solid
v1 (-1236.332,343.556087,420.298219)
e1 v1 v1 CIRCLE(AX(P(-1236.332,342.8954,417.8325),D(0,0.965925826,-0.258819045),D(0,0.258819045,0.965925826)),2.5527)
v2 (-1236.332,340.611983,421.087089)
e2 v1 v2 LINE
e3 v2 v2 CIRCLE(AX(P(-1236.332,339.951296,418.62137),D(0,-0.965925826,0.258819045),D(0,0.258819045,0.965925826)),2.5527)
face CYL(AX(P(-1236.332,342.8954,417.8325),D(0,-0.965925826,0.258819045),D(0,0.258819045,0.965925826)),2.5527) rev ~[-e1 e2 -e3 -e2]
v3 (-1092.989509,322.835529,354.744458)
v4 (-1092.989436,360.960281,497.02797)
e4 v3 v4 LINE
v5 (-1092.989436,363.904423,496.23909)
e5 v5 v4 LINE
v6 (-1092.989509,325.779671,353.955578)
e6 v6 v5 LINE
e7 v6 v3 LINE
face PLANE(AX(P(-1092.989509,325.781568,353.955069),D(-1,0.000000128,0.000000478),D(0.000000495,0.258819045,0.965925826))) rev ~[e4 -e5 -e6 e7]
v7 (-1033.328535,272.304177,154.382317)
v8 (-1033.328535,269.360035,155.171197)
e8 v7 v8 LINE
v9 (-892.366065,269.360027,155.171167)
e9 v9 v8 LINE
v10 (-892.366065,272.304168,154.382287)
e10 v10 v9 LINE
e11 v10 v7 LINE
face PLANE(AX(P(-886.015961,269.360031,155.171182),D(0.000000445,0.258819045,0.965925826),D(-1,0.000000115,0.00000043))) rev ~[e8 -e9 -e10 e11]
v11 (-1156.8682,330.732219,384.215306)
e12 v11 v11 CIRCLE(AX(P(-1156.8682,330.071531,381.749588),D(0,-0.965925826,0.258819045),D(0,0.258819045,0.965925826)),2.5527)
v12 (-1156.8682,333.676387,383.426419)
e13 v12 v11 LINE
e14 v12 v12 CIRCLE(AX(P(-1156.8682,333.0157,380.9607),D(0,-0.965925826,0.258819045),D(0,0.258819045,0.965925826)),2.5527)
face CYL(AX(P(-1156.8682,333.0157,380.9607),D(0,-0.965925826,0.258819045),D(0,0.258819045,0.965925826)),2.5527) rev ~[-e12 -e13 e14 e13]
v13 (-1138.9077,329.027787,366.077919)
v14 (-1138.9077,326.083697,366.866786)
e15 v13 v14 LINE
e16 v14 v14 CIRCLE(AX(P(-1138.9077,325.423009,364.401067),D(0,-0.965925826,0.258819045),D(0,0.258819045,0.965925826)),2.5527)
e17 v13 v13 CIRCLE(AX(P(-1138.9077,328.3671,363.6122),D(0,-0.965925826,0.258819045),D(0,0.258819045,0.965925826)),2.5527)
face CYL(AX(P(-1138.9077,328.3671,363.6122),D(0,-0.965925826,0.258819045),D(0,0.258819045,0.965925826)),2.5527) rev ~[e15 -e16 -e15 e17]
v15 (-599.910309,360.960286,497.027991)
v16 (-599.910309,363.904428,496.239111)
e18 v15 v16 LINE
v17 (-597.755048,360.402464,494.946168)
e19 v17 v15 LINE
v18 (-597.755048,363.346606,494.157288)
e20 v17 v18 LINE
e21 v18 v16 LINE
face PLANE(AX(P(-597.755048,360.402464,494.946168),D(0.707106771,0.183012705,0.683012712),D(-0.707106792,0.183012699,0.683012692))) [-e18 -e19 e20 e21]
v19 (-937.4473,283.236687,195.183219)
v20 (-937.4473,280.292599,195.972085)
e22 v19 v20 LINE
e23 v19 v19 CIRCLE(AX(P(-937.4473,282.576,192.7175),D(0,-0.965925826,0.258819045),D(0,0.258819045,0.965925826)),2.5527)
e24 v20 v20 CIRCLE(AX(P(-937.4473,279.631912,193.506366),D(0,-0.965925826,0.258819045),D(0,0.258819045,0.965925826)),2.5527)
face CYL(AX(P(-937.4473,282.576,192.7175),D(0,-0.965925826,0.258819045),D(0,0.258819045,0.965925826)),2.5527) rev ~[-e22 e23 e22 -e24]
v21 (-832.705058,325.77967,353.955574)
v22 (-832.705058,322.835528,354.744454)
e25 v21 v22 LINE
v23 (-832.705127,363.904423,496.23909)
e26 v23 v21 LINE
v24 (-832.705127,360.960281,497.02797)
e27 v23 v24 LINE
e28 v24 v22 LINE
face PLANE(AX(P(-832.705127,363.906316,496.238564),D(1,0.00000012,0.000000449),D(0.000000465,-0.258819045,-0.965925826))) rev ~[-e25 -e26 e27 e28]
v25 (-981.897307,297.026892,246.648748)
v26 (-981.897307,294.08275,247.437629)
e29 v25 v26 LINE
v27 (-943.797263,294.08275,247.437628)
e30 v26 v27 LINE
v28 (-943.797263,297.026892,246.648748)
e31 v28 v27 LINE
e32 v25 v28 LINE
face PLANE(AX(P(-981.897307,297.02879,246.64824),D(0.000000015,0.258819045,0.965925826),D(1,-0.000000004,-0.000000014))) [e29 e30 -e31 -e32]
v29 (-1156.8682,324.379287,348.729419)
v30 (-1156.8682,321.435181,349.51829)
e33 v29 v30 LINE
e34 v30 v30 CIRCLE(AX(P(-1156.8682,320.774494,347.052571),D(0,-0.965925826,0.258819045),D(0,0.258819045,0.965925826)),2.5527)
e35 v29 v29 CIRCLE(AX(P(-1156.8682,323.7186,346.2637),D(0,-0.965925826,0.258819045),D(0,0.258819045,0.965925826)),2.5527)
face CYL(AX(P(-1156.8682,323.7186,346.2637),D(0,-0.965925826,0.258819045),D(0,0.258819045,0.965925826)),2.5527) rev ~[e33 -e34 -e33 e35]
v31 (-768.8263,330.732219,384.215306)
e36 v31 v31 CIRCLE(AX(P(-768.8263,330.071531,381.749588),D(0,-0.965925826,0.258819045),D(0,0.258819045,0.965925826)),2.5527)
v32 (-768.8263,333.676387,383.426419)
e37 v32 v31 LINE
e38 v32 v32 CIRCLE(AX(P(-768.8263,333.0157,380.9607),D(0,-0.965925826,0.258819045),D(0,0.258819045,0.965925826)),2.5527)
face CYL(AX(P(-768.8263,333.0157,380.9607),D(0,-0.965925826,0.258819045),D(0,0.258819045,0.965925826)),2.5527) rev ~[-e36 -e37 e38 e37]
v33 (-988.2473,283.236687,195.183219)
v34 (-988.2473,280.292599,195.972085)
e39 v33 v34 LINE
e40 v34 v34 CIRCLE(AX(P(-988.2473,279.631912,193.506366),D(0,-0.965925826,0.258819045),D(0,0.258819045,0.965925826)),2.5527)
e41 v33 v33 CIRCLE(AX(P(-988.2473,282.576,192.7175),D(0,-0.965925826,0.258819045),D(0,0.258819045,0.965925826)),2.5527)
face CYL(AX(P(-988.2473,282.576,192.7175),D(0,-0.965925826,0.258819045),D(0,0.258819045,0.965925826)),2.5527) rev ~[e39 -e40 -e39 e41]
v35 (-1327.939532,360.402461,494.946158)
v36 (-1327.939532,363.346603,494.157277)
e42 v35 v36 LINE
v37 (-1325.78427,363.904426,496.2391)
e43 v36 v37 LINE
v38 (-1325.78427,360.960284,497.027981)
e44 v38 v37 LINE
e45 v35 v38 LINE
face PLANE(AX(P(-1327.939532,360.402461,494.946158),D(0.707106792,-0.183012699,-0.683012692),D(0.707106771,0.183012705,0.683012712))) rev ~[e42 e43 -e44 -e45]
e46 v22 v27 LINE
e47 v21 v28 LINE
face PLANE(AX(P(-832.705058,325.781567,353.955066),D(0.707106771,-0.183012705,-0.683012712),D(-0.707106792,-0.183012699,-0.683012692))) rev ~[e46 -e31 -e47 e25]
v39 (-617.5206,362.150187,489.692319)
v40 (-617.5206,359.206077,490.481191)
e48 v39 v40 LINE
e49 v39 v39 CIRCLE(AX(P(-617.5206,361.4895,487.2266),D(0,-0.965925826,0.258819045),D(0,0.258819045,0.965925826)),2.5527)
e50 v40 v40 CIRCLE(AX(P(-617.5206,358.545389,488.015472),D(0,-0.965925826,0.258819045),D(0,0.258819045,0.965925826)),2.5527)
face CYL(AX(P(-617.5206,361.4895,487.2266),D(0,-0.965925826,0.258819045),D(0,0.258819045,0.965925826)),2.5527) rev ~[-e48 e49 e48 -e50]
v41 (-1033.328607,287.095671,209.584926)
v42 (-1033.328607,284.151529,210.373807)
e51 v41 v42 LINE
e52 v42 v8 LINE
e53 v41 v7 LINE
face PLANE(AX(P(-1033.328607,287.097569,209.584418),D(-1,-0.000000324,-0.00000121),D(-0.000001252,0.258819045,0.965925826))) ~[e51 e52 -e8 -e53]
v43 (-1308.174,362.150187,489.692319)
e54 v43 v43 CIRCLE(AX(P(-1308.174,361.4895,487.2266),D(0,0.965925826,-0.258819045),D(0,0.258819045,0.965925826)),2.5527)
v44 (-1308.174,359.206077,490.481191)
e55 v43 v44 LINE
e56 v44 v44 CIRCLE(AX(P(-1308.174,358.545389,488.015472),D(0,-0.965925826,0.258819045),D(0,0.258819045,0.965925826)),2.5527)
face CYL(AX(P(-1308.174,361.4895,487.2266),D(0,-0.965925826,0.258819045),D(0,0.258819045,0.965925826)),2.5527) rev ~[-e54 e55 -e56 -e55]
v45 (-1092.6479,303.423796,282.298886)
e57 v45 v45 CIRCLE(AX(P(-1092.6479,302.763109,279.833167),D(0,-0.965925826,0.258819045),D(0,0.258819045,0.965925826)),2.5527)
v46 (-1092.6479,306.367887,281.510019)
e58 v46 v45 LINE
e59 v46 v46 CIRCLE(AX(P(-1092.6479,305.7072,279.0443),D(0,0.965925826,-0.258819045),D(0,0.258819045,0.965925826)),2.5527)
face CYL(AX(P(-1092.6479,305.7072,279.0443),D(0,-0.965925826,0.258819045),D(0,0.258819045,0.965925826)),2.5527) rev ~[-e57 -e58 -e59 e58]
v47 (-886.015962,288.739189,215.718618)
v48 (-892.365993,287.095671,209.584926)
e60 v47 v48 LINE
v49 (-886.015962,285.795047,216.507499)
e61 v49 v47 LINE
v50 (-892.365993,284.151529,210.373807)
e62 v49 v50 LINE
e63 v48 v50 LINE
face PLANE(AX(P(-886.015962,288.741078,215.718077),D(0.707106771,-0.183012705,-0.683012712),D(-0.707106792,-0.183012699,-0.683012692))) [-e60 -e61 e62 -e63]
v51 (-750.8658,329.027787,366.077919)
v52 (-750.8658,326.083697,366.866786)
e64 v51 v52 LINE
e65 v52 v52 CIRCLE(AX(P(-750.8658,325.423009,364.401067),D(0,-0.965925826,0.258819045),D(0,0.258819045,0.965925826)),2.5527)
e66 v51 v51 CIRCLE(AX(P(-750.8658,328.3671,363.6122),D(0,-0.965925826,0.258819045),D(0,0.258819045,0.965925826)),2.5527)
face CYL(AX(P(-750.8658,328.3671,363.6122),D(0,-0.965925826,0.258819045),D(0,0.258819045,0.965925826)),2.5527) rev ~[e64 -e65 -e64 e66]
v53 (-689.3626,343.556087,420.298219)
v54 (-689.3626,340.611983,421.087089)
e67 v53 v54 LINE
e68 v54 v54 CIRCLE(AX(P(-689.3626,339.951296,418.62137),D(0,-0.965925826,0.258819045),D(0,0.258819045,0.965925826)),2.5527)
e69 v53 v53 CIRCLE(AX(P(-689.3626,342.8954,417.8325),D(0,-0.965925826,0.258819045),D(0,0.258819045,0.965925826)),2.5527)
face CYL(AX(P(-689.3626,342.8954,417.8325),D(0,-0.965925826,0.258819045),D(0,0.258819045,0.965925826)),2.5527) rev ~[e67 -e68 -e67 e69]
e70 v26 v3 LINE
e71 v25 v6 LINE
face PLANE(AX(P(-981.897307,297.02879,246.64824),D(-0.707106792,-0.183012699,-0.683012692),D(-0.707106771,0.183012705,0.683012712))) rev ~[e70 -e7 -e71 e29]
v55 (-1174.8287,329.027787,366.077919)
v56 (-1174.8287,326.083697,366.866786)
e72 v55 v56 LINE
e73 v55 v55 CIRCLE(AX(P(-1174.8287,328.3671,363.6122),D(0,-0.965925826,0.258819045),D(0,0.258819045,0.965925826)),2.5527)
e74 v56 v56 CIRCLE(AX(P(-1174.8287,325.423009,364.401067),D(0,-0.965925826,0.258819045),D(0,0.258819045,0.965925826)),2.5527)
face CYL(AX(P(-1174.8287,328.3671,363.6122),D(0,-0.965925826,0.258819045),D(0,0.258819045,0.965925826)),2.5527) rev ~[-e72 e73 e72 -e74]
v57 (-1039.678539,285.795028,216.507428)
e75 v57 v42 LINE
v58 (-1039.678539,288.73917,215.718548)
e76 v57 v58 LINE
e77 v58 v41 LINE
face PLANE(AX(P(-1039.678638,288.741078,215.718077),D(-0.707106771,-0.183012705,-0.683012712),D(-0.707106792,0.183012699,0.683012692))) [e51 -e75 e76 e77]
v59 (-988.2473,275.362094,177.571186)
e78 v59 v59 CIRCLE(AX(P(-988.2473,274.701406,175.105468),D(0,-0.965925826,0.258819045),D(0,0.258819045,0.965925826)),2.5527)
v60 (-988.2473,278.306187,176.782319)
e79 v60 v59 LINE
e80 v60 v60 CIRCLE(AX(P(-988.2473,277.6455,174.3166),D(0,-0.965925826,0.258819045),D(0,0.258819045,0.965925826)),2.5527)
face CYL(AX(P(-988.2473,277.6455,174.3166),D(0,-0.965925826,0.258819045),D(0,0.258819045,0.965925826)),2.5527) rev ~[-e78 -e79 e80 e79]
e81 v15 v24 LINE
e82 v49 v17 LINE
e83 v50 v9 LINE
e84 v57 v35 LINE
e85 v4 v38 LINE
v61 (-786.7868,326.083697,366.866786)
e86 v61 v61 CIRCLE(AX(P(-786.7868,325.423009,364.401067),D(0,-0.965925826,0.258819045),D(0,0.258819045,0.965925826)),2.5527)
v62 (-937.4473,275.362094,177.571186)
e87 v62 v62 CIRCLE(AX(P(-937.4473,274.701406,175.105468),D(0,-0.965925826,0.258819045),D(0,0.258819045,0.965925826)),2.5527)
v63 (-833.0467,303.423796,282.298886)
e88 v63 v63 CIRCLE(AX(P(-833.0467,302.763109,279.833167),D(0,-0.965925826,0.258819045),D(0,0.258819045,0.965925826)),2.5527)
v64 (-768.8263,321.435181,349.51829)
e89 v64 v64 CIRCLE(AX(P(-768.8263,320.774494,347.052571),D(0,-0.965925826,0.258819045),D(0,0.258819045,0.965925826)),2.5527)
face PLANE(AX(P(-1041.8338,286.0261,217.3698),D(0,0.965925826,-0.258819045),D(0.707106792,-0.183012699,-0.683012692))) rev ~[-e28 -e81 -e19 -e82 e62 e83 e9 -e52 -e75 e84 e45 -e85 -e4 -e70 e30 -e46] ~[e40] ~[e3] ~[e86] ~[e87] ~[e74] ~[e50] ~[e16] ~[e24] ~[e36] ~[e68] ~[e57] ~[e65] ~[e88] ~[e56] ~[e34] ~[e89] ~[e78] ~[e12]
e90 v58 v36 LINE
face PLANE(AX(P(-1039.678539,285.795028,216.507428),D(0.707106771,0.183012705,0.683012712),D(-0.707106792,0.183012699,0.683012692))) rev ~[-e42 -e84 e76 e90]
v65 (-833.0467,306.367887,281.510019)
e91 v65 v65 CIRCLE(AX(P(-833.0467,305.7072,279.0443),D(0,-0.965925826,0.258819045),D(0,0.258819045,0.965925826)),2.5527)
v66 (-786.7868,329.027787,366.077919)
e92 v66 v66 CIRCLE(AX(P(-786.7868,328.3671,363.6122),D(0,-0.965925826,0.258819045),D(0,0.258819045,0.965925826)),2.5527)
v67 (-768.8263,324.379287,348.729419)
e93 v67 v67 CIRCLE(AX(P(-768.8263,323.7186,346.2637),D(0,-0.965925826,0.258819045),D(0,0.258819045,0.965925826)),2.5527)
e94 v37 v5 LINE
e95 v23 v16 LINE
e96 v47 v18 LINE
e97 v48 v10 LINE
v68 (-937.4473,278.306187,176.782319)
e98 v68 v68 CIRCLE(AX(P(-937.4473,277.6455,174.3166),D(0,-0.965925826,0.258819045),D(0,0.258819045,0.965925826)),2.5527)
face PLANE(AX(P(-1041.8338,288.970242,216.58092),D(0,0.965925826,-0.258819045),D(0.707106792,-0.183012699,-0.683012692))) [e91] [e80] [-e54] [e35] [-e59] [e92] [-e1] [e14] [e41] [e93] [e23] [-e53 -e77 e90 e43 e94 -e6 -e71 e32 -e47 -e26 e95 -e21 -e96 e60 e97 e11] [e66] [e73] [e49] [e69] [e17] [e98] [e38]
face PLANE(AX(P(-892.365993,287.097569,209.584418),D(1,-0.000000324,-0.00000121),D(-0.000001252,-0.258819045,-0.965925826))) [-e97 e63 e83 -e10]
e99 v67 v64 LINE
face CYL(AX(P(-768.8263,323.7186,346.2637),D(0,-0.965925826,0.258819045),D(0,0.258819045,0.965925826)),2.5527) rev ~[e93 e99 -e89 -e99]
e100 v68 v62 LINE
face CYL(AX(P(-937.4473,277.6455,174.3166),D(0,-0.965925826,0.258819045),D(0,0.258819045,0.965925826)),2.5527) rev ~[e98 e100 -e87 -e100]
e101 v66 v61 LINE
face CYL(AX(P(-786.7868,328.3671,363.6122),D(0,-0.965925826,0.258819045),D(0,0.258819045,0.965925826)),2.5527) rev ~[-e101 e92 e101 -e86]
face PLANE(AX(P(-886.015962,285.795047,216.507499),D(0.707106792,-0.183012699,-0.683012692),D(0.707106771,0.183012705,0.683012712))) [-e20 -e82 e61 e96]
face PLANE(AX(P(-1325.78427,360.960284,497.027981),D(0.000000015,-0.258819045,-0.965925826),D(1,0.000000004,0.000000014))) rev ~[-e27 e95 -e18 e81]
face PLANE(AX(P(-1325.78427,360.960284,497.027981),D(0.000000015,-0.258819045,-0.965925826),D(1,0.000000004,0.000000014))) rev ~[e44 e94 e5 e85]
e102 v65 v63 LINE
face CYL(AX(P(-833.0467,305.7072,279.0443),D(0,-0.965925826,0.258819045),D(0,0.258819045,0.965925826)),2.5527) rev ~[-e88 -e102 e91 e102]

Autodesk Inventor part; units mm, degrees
ref_plane "YZ Plane" through (0, 0, 0) normal (1, 0, 0) x (0, 1, 0)
ref_plane "Work Plane1" through (-1041.8338, 286.0261, 217.3698) normal (0, 0.9659258, -0.258819) x (0.7071068, -0.1830127, -0.6830127)
sketch "Sketch1" plane through (-1041.8338, 286.0261, 217.3698) normal (0, 0.9659258, -0.258819) x (0.7071068, -0.1830127, -0.6830127)
  line L0 (110.8111, -517.2111) -> (110.8111, -110.8111) construction
  line L1 (109.9183, -108.6558) -> (2.1553, -0.8927) construction
  line L2 (107.7631, -517.2111) -> (-203.2, -206.248) construction
  line L3 (2.1553, -0.8927) -> (110.8111, -109.5486)
  line L4 (110.8111, -109.5486) -> (110.8111, -517.2111)
  line L5 (110.8111, -517.2111) -> (107.7631, -517.2111)
  line L6 (107.7631, -517.2111) -> (-203.2, -206.248)
  line L7 (56.4832, -55.2206) -> (-148.8721, -260.5759) construction
  line L8 (110.8111, -109.5486) -> (2.1553, -0.8927)
  line L9 (2.1553, -0.8927) -> (-405.5073, -0.8927)
  line L10 (-405.5073, -0.8927) -> (-405.5073, -3.9407)
  line L11 (-405.5073, -3.9407) -> (-94.5442, -314.9038)
  line L12 (110.8111, -109.5486) -> (155.7124, -64.6473)
  line L13 (155.7124, -64.6473) -> (47.0565, 44.0085)
  line L14 (47.0565, 44.0085) -> (2.1553, -0.8927)
  line L15 (2.1553, -0.8927) -> (110.8111, -109.5486)
  point P0 (937.5005, -535.875)
  point P1 (2.1553, -0.8927)
  point P2 (-203.2, -206.248)
  point P3 (110.8111, -109.5486)
  dimension "d1" = 63.5
extrude "Plate1" add sketch "Sketch1" along normal blind 3.048
sketch "Sketch2" plane through (-1041.8338, 288.9702, 216.5809) normal (0, 0.9659258, -0.258819) x (0.7071068, 0.1830127, 0.6830127)
  line L0 (-44.0085, 47.0565) -> (64.6473, 155.7124) construction
  line L1 (64.6473, 155.7124) -> (109.5486, 110.8111) construction
  line L2 (10.3194, 101.3844) -> (24.957, 86.7468) construction
  point P0 (535.875, 937.5005)
  point P1 (42.8728, 104.752)
  point P2 (6.9518, 68.831)
  point P3 (56.3432, 91.2817)
  point P4 (20.4222, 55.3606)
  dimension "d2" = 20.6375
  dimension "d3" = 20.6375
  dimension "d4" = 50.8
  dimension "d7" = 19.05
  dimension "d12" = 25.4
hole "Hole1" at (-937.4473, 277.6455, 174.3166) at (-988.2473, 277.6455, 174.3166) at (-937.4473, 282.576, 192.7175) at (-988.2473, 282.576, 192.7175) direction (0, -0.9659258, 0.258819) diameter 5.1054 end through all clearance for "Flat Head Machine Screw (82)" size "#10" standard "Ansi Unified Screw Threads"
sketch "Sketch3" plane through (-1041.8338, 288.9702, 216.5809) normal (0, 0.9659258, -0.258819) x (0.7071068, 0.1830127, 0.6830127)
  circle A0 centre (56.3432, 91.2817) radius 2.5527 construction
  circle A1 centre (42.8728, 104.752) radius 2.5527 construction
  circle A2 centre (6.9518, 68.831) radius 2.5527 construction
  circle A3 centre (20.4222, 55.3606) radius 2.5527 construction
  line L0 (517.2111, 110.8111) -> (517.2111, 107.7631) construction
  line L1 (109.5486, 110.8111) -> (517.2111, 110.8111) construction
  line L2 (64.6473, 155.7124) -> (109.5486, 110.8111) construction
  line L3 (-44.0085, 47.0565) -> (64.6473, 155.7124) construction
  line L4 (0.8927, 2.1553) -> (-44.0085, 47.0565) construction
  line L5 (0.8927, -405.5073) -> (0.8927, 2.1553) construction
  line L6 (3.9407, -405.5073) -> (0.8927, -405.5073) construction
  line L7 (517.2111, 107.7631) -> (3.9407, -405.5073) construction
  line L8 (10.3194, 101.3844) -> (260.5759, -148.8721) construction
  line L9 (313.3798, 110.8111) -> (313.3798, 98.1111) construction
  line L10 (109.5486, 110.8111) -> (517.2111, 110.8111) construction
  point P0 (535.875, 937.5005)
  point P1 (287.9798, 98.1111)
  point P2 (313.3798, 72.7111)
  point P3 (287.9798, 72.7111)
  point P4 (13.5927, -201.676)
  point P5 (13.5927, -176.276)
  point P6 (38.9927, -201.676)
  point P7 (38.9927, -176.276)
  dimension "d20" = 12.7
  dimension "d23" = 25.4
  dimension "d26" = 25.4
hole "Hole2" at (-750.8658, 328.3671, 363.6122) at (-768.8263, 323.7186, 346.2637) at (-768.8263, 333.0157, 380.9607) at (-786.7868, 328.3671, 363.6122) at (-1156.8682, 333.0157, 380.9607) at (-1138.9077, 328.3671, 363.6122) at (-1174.8287, 328.3671, 363.6122) at (-1156.8682, 323.7186, 346.2637) direction (0, -0.9659258, 0.258819) diameter 5.1054 end through all clearance for "Flat Head Machine Screw (82)" size "#10" standard "Ansi Unified Screw Threads"
sketch "Sketch4" plane through (-1041.8338, 288.9702, 216.5809) normal (0, 0.9659258, -0.258819) x (0.7071068, 0.1830127, 0.6830127)
  line L0 (109.5486, 110.8111) -> (64.6473, 155.7124) projected
  line L1 (109.5486, 110.8111) -> (100.5683, 110.8111)
  line L2 (109.5486, 110.8111) -> (517.2111, 110.8111) projected
  line L3 (100.5683, 110.8111) -> (60.1571, 151.2222)
  line L4 (-44.0085, 47.0565) -> (64.6473, 155.7124) projected
  line L5 (64.6473, 155.7124) -> (60.1571, 151.2222)
  point P0 (535.875, 937.5005)
  dimension "d36" = 6.35
extrude "Cut1" cut sketch "Sketch4" against normal blind 3.048
ref_plane "Work Plane2" through (-962.8473, 265.9096, 142.2942) normal (1, 0, 0) x (0, -0.9659258, 0.258819)
mirror "Mirror1" about plane through (-962.8473, 265.9096, 142.2942) normal (1, 0, 0) of "Cut1"
sketch "Sketch5" plane through (-1041.8338, 288.9702, 216.5809) normal (0, 0.9659258, -0.258819) x (0.7071068, 0.1830127, 0.6830127)
  line L0 (100.5683, 110.8111) -> (517.2111, 110.8111) projected
  line L1 (517.2111, 101.9084) -> (109.471, 101.9084) construction
  line L2 (517.2111, 110.8111) -> (517.2111, 107.7631) projected
  line L3 (100.5683, 110.8111) -> (60.1571, 151.2222) projected
  point P0 (535.875, 937.5005)
  point P1 (498.1611, 101.9084)
  point P2 (396.5611, 101.9084)
  point P3 (193.3611, 101.9084)
  dimension "d40" = 8.9027
  dimension "d41" = 101.6
  dimension "d42" = 19.05
  dimension "d45" = 203.2
hole "Hole3" at (-617.5206, 361.4895, 487.2266) at (-689.3626, 342.8954, 417.8325) at (-833.0467, 305.7072, 279.0443) direction (0, -0.9659258, 0.258819) diameter 5.1054 end through all
mirror "Mirror2" about plane through (-962.8473, 265.9096, 142.2942) normal (1, 0, 0) of "Hole3"
sketch "Sketch8" plane through (-1041.8338, 288.9702, 216.5809) normal (0, 0.9659258, -0.258819) x (0.7071068, 0.1830127, 0.6830127)
  line L0 (352.6003, -56.8477) -> (248.4416, 47.3111)
  line L1 (248.4416, 47.3111) -> (91.3335, 47.3111)
  line L2 (64.3927, 20.3703) -> (64.3927, -136.7378)
  line L3 (64.3927, -136.7378) -> (168.5515, -240.8965)
  line L4 (0.8927, 11.1355) -> (0.8927, -405.5073) projected
  line L5 (100.5683, 110.8111) -> (517.2111, 110.8111) projected
  line L6 (517.2111, 107.7631) -> (3.9407, -405.5073) projected
  line L7 (-39.5184, 51.5467) -> (60.1571, 151.2222) construction
  line L8 (10.3194, 101.3844) -> (260.5759, -148.8721) construction
  line L9 (64.3927, 20.3703) -> (91.3335, 47.3111)
  point P0 (535.875, 937.5005)
  point P1 (64.3927, -58.1837)
  dimension "d62" = 63.5
  dimension "d65" = 234.95
  dimension "d66" = 234.95
  dimension "d75" = 63.5
  dimension "d76" = 135
  dimension "d77" = 135
extrude "Extrusion2" cut sketch "Sketch8" against normal blind 25.4
equation "\"d3\" = d2"
equation "\"d18\" = Thickness"
equation "\"d37\" = Thickness"
equation "\"d51\" = Thickness"
equation "\"d0\" = Thickness"
equation "\"BendRadius\" = Thickness"
equation "\"BendReliefWidth\" = Thickness"
equation "\"BendReliefDepth\" = 0.5 * Thickness"
equation "\"CornerReliefSize\" = 4 * Thickness"
equation "\"MinimumRemnant\" = 2 * Thickness"
equation "\"TransitionRadius\" = BendRadius"
equation "\"JacobiRadiusSize\" = BendRadius"
equation "\"GapSize\" = Thickness"
equation "\"Thickness\" = 3.048"
properties part number "hopper_back" material "Polycarbonate, Clear"
